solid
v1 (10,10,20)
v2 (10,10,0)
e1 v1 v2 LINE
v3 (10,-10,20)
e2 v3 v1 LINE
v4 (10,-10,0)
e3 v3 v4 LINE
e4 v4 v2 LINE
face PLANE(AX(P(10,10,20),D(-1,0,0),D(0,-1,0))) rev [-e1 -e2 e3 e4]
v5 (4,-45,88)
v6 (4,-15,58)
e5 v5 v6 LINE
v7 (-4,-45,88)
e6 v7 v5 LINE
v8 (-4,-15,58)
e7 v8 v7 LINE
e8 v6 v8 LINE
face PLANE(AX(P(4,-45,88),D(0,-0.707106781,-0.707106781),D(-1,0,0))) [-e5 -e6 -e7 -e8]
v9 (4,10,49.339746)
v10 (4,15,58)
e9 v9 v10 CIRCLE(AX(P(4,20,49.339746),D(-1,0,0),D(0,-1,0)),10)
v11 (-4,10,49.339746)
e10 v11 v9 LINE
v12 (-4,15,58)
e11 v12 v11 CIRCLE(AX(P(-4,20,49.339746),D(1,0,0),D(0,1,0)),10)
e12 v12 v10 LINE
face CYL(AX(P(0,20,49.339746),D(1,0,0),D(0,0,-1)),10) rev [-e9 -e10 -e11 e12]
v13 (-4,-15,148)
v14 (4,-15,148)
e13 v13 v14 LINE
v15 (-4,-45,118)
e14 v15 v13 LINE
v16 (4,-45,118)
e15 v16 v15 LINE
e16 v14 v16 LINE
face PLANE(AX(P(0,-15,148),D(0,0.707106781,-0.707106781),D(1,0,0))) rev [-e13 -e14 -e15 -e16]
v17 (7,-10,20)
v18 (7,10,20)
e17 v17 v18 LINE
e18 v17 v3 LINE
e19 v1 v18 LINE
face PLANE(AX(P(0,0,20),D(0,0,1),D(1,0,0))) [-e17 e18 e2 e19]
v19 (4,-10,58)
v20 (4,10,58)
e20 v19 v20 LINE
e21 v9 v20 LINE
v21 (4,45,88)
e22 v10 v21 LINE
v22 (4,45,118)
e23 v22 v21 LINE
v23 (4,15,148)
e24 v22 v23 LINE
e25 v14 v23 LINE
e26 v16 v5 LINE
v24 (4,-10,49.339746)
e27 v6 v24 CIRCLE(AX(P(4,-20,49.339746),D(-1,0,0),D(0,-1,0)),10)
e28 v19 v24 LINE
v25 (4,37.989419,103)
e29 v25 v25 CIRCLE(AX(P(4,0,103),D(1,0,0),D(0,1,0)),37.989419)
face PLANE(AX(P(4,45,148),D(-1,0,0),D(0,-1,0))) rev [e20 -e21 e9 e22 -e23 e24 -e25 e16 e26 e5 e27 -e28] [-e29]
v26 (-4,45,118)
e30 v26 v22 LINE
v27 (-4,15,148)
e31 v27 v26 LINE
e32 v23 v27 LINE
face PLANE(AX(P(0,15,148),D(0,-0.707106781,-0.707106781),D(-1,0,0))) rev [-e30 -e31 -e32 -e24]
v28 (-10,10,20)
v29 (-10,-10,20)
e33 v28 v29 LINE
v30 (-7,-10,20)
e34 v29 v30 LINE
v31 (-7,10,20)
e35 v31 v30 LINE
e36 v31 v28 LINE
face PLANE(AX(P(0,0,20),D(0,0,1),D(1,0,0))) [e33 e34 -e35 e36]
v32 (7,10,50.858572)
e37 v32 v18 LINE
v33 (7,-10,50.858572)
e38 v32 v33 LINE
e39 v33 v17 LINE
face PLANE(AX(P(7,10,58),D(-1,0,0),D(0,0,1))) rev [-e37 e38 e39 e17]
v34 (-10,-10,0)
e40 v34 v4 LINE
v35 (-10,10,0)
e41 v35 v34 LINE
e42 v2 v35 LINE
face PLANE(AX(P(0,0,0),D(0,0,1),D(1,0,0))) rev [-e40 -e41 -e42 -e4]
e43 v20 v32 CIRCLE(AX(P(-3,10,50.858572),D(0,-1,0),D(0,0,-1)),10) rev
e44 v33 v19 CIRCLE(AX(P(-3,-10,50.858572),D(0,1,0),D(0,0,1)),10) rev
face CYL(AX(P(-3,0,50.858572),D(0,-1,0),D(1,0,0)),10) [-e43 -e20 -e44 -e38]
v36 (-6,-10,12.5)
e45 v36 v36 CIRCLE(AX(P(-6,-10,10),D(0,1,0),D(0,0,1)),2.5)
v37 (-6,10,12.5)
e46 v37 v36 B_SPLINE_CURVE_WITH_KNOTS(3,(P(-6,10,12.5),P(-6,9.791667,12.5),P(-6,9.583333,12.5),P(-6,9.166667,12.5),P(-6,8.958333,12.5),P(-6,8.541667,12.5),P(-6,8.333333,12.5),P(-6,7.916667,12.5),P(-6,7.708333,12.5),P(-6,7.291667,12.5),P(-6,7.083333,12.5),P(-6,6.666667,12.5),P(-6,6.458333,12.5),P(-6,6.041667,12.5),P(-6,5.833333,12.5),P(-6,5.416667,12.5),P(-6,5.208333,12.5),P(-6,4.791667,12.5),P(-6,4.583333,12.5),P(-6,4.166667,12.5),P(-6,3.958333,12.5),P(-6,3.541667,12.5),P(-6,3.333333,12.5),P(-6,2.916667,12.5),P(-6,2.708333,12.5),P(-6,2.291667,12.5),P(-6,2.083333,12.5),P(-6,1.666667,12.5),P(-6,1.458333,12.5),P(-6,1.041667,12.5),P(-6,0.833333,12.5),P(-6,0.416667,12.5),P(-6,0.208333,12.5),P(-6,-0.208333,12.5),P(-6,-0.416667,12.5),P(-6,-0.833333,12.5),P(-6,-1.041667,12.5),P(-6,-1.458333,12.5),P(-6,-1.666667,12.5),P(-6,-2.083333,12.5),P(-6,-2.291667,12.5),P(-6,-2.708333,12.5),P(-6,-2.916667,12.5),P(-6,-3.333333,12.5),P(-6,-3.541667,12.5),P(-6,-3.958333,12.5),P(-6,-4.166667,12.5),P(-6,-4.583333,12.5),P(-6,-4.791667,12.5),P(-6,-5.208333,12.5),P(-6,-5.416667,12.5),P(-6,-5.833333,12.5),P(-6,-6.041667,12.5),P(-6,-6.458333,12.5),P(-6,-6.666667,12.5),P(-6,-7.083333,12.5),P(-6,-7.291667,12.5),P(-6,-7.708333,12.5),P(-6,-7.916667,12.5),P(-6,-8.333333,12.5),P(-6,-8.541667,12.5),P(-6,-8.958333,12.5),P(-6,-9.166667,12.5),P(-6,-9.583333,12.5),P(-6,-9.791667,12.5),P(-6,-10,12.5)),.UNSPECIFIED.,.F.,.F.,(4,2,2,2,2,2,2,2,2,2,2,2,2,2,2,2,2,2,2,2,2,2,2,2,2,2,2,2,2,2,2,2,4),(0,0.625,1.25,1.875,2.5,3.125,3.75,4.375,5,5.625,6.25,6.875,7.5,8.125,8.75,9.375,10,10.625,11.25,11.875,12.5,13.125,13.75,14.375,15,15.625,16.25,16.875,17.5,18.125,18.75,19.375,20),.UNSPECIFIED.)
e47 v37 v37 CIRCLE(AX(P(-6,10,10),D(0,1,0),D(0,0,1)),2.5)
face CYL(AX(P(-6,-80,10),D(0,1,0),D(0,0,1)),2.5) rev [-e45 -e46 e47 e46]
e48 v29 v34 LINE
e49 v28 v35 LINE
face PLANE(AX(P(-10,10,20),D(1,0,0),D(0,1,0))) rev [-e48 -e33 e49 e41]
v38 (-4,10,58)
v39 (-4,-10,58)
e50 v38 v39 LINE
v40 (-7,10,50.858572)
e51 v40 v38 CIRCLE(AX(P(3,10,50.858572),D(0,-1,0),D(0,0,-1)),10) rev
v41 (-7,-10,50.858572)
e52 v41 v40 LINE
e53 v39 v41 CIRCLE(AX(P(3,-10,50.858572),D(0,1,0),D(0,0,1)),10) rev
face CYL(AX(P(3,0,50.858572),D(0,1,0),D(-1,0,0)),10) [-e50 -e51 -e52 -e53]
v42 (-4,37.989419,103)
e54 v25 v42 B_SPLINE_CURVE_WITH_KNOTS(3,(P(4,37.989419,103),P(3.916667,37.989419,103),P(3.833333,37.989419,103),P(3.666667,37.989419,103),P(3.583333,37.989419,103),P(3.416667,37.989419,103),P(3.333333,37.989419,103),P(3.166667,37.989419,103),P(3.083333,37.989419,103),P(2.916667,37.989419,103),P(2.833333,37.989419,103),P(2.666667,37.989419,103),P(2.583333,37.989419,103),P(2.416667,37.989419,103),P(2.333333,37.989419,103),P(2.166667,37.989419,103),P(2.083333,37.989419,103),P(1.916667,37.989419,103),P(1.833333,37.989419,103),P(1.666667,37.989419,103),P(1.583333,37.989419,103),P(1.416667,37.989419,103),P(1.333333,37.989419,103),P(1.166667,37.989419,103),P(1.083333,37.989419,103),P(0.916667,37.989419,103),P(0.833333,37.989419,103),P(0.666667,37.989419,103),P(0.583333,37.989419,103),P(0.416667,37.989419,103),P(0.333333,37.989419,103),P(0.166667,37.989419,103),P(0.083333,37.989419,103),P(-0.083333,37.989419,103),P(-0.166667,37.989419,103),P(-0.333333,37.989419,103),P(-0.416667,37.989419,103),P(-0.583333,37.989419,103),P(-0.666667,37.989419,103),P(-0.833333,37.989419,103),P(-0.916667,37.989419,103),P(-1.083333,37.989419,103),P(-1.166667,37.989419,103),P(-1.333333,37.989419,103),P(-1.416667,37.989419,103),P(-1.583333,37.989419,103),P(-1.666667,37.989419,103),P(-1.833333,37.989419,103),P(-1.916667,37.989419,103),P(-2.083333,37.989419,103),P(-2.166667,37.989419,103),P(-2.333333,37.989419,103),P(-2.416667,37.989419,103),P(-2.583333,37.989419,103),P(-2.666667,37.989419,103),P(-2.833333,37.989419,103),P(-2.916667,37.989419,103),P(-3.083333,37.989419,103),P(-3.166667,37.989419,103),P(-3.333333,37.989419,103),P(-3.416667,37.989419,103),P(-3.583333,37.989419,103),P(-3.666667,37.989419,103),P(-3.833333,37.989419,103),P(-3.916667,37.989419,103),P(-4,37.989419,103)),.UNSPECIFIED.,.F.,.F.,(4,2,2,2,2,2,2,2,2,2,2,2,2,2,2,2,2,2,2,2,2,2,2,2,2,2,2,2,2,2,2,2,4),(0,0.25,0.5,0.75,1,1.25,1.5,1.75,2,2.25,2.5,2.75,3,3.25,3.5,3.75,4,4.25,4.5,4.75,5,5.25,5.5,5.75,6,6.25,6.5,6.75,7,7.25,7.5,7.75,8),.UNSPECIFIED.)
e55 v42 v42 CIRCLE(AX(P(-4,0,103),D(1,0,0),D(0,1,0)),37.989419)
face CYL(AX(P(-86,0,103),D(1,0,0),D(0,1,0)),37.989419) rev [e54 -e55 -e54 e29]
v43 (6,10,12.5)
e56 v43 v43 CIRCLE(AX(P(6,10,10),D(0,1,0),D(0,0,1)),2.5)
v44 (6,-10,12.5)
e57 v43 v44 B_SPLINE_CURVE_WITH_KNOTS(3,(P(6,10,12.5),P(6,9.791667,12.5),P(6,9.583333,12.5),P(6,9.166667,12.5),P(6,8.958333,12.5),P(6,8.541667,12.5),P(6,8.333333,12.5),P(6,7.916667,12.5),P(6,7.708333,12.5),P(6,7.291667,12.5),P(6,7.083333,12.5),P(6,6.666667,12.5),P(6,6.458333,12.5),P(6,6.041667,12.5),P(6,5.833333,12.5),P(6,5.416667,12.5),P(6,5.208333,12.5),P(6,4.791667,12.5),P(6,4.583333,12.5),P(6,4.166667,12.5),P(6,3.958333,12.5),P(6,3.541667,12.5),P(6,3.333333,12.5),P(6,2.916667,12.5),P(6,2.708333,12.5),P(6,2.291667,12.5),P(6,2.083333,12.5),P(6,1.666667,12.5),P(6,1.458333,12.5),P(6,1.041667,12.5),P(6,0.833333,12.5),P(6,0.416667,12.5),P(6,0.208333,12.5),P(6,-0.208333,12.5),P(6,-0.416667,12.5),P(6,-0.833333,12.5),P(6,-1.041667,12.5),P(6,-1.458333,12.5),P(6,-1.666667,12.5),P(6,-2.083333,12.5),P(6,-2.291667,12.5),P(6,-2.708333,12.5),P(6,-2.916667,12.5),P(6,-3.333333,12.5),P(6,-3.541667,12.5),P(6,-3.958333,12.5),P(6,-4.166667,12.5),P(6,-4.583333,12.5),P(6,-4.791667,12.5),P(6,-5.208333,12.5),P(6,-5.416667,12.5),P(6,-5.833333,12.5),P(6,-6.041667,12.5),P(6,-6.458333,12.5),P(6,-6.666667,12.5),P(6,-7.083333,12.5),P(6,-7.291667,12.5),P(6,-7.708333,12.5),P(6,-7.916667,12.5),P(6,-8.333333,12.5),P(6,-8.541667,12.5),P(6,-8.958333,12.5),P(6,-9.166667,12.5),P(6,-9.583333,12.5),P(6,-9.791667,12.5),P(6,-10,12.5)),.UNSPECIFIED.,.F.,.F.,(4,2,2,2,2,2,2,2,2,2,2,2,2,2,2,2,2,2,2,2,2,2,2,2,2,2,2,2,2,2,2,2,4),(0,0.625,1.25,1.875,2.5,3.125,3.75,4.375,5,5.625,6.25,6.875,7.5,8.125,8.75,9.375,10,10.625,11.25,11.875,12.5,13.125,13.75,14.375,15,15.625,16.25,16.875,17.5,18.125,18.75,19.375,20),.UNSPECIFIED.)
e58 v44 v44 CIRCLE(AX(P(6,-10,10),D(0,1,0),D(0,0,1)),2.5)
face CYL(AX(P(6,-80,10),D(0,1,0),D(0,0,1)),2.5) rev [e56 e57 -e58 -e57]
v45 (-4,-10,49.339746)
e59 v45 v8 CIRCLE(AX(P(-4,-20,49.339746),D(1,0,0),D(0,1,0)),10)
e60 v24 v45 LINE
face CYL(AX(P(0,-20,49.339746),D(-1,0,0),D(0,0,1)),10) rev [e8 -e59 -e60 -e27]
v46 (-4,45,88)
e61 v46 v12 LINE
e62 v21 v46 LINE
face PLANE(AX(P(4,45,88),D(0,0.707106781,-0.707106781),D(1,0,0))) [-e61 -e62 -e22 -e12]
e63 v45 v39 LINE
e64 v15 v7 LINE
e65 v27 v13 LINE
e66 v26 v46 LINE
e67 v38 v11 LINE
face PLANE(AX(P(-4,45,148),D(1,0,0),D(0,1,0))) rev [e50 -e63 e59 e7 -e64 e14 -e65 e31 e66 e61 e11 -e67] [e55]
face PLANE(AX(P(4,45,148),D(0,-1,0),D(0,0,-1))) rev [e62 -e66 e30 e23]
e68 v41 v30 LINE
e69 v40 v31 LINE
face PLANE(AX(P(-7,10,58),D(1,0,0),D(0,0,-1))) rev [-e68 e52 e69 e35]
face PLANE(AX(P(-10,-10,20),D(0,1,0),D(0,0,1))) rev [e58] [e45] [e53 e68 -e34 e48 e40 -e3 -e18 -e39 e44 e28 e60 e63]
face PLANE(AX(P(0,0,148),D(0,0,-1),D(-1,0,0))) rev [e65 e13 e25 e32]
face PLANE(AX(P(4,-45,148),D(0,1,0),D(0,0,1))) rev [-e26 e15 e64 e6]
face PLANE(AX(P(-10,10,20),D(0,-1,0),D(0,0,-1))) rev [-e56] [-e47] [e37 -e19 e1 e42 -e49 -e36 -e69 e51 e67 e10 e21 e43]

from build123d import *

# Parameters (mm, degrees)
SKETCH_1_W          = 20
SKETCH_1_H          = 20
EXTRUDE_1_DEPTH     = 20
SKETCH_2_W          = 14
SKETCH_2_H          = 20
EXTRUDE_2_DEPTH     = 38
SKETCH_8_W          = 8
SKETCH_8_H          = 90
EXTRUDE_4_DEPTH     = 90
CHAMFER_2_SIZE      = 30
CUT_EXTRUDE_3_DEPTH = 90
FILLET_1_R          = 10
SKETCH_10_R         = 2.5
CUT_EXTRUDE_4_DEPTH = 90


with BuildPart() as part:
    # 草图1 → 凸台-拉伸1 (new body)
    with BuildSketch(Plane.XY):
        Rectangle(SKETCH_1_W, SKETCH_1_H)
    extrude(amount=EXTRUDE_1_DEPTH)

    # 草图2 → 凸台-拉伸2 (add)
    with BuildSketch(Plane.XY.offset(20)):
        Rectangle(SKETCH_2_W, SKETCH_2_H)
    extrude(amount=EXTRUDE_2_DEPTH)

    # 草图8 → 凸台-拉伸4 (add)
    with BuildSketch(Plane.XY.offset(58)):
        Rectangle(SKETCH_8_W, SKETCH_8_H)
    extrude(amount=EXTRUDE_4_DEPTH)

    # 倒角2
    chamfer_2_edges = [part.edges().sort_by_distance(p)[0] for p in [
        (0, -45, 58),
        (0, 45, 58),
        (0, -45, 148),
        (0, 45, 148),
    ]]
    chamfer(chamfer_2_edges, length=CHAMFER_2_SIZE)

    # 草图9 → 切除-拉伸3 (cut)
    with BuildSketch(Plane(origin=(4, 0, 0), x_dir=(0, 0, -1), z_dir=(1, 0, 0))):
        with BuildLine():
            ThreePointArc((-65.010581468, 0), (-76.137424542, 26.862575458), (-103, 37.989418532))
            Line((-103, 37.989418532), (-103, -37.989418532))
            ThreePointArc((-103, -37.989418532), (-76.137424542, -26.862575458), (-65.010581468, 0))
        make_face()
        with BuildLine():
            Line((-103, -37.989418532), (-103, 37.989418532))
            ThreePointArc((-103, 37.989418532), (-140.989418532, 0), (-103, -37.989418532))
        make_face()
    extrude(amount=-CUT_EXTRUDE_3_DEPTH, mode=Mode.SUBTRACT)

    # 圆角1
    # the kernel refuses this fillet: 10 mm, written as the material it adds along each edge
    with BuildSketch(Plane(origin=(4, -10, 58), x_dir=(0, -1, 0), z_dir=(-1, 0, 0)), Plane(origin=(-4, 10, 58), x_dir=(0, 1, 0), z_dir=(1, 0, 0))) as fillet_1_piece_1:
        with BuildLine():
            CenterArc((10, -8.660254038), FILLET_1_R, 120, 60)
            Line((0, -8.660254038), (0, 0))
            Line((0, 0), (5, 0))
        make_face()
    extrude(amount=8)
    # the kernel refuses this fillet: 10 mm, written as the material it takes off along each edge
    with BuildSketch(Plane(origin=(7, 27.853571071, 58), x_dir=(-1, 0, 0), z_dir=(0, -1, 0)), Plane(origin=(-7, -27.853571071, 58), x_dir=(1, 0, 0), z_dir=(0, 1, 0))) as fillet_1_2_piece_1:
        with BuildLine():
            CenterArc((10, 7.141428429), FILLET_1_R, 180, 45.572995999)
            Line((0, 7.141428429), (0, 0))
            Line((0, 0), (3, 0))
        make_face()
    extrude(amount=55.707142143, mode=Mode.SUBTRACT)

    # 草图10 → 切除-拉伸4 (cut)
    with BuildSketch(Plane(origin=(0, 10, 0), x_dir=(1, 0, 0), z_dir=(0, 1, 0))):
        with Locations(Location((-6, -10, 0), (0, 0, 270))):
            Circle(SKETCH_10_R)
        with Locations(Location((6, -10, 0), (0, 0, 270))):
            Circle(SKETCH_10_R)
    extrude(amount=-CUT_EXTRUDE_4_DEPTH, mode=Mode.SUBTRACT)


solid = part.part
